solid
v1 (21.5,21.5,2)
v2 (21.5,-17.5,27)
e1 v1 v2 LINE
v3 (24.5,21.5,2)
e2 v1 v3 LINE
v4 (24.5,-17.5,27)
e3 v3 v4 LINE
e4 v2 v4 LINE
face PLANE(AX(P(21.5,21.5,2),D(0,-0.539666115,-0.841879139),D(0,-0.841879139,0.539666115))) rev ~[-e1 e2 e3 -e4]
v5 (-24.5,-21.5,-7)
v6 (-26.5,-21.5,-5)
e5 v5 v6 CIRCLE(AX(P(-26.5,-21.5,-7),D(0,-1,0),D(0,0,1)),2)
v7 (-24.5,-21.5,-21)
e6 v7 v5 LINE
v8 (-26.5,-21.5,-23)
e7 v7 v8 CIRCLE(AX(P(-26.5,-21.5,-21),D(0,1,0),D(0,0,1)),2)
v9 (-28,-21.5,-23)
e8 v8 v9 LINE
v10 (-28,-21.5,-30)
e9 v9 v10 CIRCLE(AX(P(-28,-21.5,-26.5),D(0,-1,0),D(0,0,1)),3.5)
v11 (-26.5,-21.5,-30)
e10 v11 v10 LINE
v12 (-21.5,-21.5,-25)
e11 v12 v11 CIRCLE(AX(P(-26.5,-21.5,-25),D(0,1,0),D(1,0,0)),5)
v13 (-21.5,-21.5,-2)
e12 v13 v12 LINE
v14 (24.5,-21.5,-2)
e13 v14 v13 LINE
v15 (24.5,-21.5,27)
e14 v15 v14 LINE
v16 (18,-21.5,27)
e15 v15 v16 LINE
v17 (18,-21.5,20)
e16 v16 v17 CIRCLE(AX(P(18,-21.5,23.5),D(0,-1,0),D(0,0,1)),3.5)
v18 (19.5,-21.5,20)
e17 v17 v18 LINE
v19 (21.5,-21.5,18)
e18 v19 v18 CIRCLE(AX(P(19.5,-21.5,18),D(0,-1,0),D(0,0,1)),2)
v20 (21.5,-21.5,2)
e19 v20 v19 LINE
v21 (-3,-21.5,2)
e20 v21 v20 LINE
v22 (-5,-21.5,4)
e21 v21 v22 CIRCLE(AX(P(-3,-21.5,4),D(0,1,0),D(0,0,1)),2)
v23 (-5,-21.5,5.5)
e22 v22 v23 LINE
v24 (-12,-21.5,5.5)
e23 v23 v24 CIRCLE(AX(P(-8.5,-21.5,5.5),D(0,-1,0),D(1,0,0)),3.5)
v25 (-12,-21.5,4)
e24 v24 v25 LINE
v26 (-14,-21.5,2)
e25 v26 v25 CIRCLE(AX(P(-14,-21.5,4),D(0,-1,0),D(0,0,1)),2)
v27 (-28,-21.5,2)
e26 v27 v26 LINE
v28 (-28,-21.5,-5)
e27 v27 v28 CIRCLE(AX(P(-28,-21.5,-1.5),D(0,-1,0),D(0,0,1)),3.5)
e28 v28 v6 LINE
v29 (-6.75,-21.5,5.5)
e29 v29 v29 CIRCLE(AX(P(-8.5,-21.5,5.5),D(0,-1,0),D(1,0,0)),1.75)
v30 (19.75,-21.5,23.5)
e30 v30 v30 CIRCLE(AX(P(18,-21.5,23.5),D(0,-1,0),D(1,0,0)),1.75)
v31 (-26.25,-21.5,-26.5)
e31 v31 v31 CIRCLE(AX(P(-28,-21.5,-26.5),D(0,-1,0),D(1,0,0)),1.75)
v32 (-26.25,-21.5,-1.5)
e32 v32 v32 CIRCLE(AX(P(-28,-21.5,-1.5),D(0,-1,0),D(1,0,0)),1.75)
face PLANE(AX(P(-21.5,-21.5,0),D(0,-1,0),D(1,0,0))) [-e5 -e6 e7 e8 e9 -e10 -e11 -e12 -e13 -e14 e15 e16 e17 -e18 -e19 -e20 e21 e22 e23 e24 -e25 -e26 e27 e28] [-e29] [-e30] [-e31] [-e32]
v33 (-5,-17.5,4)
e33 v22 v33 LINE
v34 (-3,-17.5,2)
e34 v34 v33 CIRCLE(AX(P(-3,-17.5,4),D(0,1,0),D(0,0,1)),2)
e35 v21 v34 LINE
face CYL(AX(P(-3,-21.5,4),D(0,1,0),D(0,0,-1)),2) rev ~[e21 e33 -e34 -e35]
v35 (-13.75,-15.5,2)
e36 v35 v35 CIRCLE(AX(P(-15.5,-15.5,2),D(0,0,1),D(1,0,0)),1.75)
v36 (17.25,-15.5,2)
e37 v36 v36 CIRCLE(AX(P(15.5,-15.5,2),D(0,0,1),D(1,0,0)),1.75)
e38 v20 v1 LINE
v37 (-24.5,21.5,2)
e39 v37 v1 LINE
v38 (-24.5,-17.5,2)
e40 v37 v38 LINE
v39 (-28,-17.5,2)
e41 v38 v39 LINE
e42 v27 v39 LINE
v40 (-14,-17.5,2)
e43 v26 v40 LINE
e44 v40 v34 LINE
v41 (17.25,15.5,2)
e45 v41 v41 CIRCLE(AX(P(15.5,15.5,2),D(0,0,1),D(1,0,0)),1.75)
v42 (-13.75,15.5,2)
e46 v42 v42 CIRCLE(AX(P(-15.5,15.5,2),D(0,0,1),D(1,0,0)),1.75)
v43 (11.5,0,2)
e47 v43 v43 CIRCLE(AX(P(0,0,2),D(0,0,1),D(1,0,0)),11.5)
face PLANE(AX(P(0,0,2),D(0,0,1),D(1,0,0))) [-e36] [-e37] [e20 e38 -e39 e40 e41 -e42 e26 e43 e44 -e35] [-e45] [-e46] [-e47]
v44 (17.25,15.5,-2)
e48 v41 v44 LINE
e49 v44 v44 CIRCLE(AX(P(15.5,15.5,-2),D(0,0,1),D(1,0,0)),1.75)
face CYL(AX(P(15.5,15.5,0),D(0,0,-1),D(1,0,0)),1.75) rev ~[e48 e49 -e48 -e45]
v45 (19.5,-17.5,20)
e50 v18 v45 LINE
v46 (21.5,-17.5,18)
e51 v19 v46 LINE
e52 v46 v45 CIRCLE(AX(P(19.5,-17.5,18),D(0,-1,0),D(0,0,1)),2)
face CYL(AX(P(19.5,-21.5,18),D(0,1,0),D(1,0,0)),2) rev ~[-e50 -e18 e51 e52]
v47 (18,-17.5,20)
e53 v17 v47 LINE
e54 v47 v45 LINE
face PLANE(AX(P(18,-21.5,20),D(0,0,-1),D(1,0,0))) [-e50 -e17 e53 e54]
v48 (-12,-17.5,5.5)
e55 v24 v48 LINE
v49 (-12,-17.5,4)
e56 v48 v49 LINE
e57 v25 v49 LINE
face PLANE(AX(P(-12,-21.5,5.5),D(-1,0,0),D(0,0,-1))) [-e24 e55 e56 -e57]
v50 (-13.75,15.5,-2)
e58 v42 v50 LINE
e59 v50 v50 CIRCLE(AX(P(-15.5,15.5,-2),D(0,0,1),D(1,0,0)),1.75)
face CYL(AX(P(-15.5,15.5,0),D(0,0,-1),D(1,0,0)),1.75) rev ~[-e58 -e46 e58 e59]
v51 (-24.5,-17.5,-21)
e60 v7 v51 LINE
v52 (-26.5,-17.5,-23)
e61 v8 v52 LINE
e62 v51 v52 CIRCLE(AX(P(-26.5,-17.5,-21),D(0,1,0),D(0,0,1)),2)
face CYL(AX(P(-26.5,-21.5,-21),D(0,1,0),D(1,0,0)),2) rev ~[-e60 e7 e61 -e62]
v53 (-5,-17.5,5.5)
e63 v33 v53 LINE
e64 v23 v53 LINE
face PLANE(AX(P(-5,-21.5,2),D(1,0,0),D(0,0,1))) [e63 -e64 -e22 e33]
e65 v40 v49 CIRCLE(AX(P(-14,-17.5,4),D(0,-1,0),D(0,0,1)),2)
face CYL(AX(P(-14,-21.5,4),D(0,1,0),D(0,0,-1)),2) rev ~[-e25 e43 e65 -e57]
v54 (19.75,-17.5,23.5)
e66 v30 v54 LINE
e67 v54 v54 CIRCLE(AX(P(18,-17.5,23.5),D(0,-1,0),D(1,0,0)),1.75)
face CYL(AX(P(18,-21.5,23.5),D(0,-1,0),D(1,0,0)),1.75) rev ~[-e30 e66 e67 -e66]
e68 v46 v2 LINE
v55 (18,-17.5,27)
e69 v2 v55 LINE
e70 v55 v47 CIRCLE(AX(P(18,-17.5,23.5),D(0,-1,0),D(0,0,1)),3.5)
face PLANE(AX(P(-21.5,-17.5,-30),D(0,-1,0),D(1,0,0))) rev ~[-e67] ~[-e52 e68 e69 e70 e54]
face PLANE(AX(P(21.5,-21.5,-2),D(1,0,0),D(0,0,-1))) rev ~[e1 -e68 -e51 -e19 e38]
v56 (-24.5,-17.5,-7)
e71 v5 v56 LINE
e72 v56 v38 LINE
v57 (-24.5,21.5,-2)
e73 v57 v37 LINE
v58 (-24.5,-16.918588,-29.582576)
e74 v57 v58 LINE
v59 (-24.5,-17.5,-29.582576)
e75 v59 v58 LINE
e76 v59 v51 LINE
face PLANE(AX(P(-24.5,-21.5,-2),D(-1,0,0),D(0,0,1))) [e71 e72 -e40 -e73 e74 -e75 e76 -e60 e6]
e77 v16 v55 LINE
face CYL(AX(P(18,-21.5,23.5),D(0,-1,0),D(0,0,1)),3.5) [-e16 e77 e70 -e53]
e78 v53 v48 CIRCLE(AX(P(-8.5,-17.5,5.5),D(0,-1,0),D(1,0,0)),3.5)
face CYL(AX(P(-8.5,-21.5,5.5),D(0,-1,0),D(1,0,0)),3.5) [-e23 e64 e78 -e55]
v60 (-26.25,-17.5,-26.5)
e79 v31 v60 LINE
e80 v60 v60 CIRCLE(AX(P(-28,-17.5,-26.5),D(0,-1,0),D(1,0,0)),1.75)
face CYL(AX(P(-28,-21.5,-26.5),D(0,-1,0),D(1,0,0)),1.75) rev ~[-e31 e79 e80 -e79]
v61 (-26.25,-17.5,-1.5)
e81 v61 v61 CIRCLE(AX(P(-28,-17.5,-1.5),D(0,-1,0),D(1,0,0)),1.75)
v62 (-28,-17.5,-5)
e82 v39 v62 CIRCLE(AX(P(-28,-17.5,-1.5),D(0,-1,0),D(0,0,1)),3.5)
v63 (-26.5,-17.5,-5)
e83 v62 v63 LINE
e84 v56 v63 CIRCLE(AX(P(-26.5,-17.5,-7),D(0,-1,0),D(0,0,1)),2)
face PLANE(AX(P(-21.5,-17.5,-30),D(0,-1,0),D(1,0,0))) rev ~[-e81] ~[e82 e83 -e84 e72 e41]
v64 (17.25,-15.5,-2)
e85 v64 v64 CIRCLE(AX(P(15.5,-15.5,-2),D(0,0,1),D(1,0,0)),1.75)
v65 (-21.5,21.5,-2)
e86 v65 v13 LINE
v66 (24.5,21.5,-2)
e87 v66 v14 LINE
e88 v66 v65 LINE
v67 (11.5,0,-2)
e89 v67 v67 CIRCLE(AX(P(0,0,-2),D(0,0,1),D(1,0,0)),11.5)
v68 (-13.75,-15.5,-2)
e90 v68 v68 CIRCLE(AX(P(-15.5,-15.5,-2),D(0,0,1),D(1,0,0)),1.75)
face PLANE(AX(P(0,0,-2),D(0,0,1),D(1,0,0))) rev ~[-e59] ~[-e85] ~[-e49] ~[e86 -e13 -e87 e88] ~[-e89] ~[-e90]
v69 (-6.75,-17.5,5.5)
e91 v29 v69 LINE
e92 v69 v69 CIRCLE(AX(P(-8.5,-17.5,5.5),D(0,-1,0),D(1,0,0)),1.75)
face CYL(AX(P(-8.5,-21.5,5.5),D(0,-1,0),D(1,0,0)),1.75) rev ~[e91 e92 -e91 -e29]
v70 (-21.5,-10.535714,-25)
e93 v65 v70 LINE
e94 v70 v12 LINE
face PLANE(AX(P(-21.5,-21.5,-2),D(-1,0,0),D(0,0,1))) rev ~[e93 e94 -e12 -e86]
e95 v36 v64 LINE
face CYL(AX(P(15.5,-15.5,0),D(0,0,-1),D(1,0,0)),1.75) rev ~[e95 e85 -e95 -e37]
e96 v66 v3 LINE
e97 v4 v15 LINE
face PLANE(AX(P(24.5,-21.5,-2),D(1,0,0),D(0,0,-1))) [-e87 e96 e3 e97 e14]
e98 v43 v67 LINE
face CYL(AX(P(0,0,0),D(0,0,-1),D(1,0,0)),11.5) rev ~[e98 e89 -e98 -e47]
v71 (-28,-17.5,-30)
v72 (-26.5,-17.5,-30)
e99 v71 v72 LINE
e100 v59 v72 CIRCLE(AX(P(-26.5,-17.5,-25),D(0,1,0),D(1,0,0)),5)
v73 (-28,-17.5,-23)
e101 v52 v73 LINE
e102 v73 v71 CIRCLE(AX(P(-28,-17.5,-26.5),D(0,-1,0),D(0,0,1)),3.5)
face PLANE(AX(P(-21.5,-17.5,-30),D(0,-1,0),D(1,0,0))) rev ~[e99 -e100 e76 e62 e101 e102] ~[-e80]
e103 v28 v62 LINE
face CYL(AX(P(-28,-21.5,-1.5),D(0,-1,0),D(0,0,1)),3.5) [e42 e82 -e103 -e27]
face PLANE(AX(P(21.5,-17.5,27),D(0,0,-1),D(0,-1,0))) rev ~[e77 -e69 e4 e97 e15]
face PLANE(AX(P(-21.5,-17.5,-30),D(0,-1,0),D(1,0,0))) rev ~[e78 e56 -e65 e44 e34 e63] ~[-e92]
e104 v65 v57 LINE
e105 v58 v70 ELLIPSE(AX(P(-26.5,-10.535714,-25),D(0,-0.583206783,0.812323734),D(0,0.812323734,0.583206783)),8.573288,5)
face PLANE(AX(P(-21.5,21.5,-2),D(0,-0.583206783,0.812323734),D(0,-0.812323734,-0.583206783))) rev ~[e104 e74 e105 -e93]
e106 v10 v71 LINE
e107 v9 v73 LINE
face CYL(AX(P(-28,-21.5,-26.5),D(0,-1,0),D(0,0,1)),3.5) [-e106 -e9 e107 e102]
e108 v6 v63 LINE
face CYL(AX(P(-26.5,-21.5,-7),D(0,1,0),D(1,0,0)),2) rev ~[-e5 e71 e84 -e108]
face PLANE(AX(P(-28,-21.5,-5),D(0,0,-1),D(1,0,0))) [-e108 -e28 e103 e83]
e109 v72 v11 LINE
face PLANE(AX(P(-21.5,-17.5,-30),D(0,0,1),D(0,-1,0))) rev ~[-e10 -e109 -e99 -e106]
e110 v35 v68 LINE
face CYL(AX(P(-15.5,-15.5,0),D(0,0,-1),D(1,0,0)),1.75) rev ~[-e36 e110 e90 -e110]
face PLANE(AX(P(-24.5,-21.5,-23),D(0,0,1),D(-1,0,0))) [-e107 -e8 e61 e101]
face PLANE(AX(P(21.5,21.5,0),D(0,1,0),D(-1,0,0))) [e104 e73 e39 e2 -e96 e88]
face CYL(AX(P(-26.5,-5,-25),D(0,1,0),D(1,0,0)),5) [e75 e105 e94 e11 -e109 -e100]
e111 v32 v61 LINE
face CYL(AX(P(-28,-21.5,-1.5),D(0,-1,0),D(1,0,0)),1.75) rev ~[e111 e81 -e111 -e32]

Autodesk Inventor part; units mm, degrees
ref_plane "YZ Plane" through (0, 0, 0) normal (1, 0, 0) x (0, 1, 0)
ref_plane "XZ Plane" through (0, 0, 0) normal (0, 1, 0) x (-1, 0, 0)
ref_plane "XY Plane" through (0, 0, 0) normal (0, 0, 1) x (1, 0, 0)
sketch "Sketch1" plane through (0, 0, 0) normal (0, 0, 1) x (1, 0, 0)
  line L0 (-15.5, 15.5) -> (15.5, 15.5) construction
  line L1 (15.5, 15.5) -> (15.5, -15.5) construction
  line L2 (15.5, -15.5) -> (-15.5, -15.5) construction
  line L3 (-15.5, -15.5) -> (-15.5, 15.5) construction
  line L4 (-15.5, 15.5) -> (15.5, -15.5) construction
  line L5 (15.5, 15.5) -> (-15.5, -15.5) construction
  circle A0 centre (0, 0) radius 11.5
  circle A1 centre (15.5, 15.5) radius 1.75
  circle A2 centre (15.5, -15.5) radius 1.75
  circle A3 centre (-15.5, -15.5) radius 1.75
  circle A4 centre (-15.5, 15.5) radius 1.75
  line L6 (-21.5, -21.5) -> (21.5, -21.5)
  line L7 (21.5, -21.5) -> (21.5, 21.5)
  line L8 (21.5, 21.5) -> (-21.5, 21.5)
  line L9 (-21.5, 21.5) -> (-21.5, -21.5)
  line L10 (-21.5, -21.5) -> (21.5, 21.5) construction
  line L11 (21.5, -21.5) -> (-21.5, 21.5) construction
  dimension "d0" = 23
  dimension "d1" = 3.5
  dimension "d2" = 31
  dimension "d3" = 31
  dimension "d4" = 43
extrude "Extrusion1" add sketch "Sketch1" against normal mid plane 4
sketch "Sketch2" plane through (-21.5, -21.5, -2) normal (-1, 0, 0) x (0, 0, 1)
  line L0 (0, 43) -> (4, 43) projected
  line L1 (0, 0) -> (0, 43) projected
  line L2 (0, 0) -> (4, 0) projected
  line L3 (4, 43) -> (4, 0) projected
  line L4 (0, 43) -> (4, 43) projected
  line L5 (0, 43) -> (-28, 4)
  line L6 (-28, 4) -> (-28, 0)
  line L7 (0, 43) -> (0, 0) projected
  line L8 (-28, 0) -> (0, 0)
  point P0 (2, 21.5)
  dimension "d7" = 28
  dimension "d8" = 4
extrude "Extrusion2" add sketch "Sketch2" along normal blind 3
sketch "Sketch3" plane through (21.5, -21.5, -2) normal (1, 0, 0) x (0, 0, -1)
  line L0 (-4, 0) -> (0, 0) projected
  line L1 (0, 43) -> (0, 0) projected
  line L2 (0, 43) -> (-4, 43) projected
  line L3 (-4, 0) -> (-4, 43) projected
  line L4 (-4, 0) -> (-4, 43) projected
  line L5 (-4, 43) -> (-29, 4)
  line L6 (-29, 4) -> (-29, 0)
  line L7 (-29, 0) -> (-4, 0)
  point P0 (-2, 21.5)
  dimension "d11" = 4
  dimension "d12" = 25
extrude "Extrusion3" add sketch "Sketch3" along normal blind 3
sketch "Sketch4" plane through (-21.5, -21.5, -30) normal (0, -1, 0) x (1, 0, 0)
  arc A0 (39.5, 57) -> (39.5, 50) centre (39.5, 53.5) ccw
  line L0 (43, 32) -> (43, 57) projected
  line L1 (43, 57) -> (39.5, 57)
  line L2 (39.5, 50) -> (43, 50)
  line L3 (39.5, 50) -> (39.5, 57) construction
  circle A1 centre (39.5, 53.5) radius 1.75
  arc A2 (-6.5, 32) -> (-6.5, 25) centre (-6.5, 28.5) ccw
  line L4 (-3, 32) -> (-6.5, 32)
  line L5 (-6.5, 25) -> (-3, 25)
  line L6 (-6.5, 25) -> (-6.5, 32) construction
  circle A3 centre (-6.5, 28.5) radius 1.75
  arc A4 (-6.5, 7) -> (-6.5, 0) centre (-6.5, 3.5) ccw
  line L7 (-3, 7) -> (-6.5, 7)
  line L8 (-6.5, 0) -> (-3, 0)
  line L9 (-6.5, 0) -> (-6.5, 7) construction
  circle A5 centre (-6.5, 3.5) radius 1.75
  line L10 (-3, 0) -> (-3, 32) projected
  arc A6 (16.5, 35.5) -> (9.5, 35.5) centre (13, 35.5) ccw
  line L11 (16.5, 32) -> (16.5, 35.5)
  line L12 (9.5, 35.5) -> (9.5, 32)
  line L13 (9.5, 35.5) -> (16.5, 35.5) construction
  circle A7 centre (13, 35.5) radius 1.75
  line L14 (43, 32) -> (-3, 32) projected
  line L15 (0, 28) -> (46, 28) projected
  line L16 (46, 32) -> (46, 57) projected
  point P0 (21.5, 30)
  dimension "d15" = 3.5
  dimension "d16" = 3.5
  dimension "d19" = 3.5
  dimension "d20" = 3.5
  dimension "d21" = 3.5
  dimension "d22" = 3.5
  dimension "d23" = 3.5
  dimension "d24" = 3.5
  dimension "d25" = 16
  dimension "d27" = 25.5
  dimension "d28" = 6.5
  dimension "d31" = 26.5
  dimension "d32" = 19.5
  dimension "d33" = 18
  dimension "d34" = 7
  dimension "d35" = 25
extrude "Extrusion4" add sketch "Sketch4" against normal blind 4
fillet "Fillet1" radius 2 5 edges at (-24.5, -19.5, -23) (-12, -19.5, 2) (-24.5, -19.5, -5) (-5, -19.5, 2) (21.5, -19.5, 20)
fillet "Fillet2" radius 5 1 edges at (-21.5, -19.5, -30)
properties part number "PitchMotorBracket"
